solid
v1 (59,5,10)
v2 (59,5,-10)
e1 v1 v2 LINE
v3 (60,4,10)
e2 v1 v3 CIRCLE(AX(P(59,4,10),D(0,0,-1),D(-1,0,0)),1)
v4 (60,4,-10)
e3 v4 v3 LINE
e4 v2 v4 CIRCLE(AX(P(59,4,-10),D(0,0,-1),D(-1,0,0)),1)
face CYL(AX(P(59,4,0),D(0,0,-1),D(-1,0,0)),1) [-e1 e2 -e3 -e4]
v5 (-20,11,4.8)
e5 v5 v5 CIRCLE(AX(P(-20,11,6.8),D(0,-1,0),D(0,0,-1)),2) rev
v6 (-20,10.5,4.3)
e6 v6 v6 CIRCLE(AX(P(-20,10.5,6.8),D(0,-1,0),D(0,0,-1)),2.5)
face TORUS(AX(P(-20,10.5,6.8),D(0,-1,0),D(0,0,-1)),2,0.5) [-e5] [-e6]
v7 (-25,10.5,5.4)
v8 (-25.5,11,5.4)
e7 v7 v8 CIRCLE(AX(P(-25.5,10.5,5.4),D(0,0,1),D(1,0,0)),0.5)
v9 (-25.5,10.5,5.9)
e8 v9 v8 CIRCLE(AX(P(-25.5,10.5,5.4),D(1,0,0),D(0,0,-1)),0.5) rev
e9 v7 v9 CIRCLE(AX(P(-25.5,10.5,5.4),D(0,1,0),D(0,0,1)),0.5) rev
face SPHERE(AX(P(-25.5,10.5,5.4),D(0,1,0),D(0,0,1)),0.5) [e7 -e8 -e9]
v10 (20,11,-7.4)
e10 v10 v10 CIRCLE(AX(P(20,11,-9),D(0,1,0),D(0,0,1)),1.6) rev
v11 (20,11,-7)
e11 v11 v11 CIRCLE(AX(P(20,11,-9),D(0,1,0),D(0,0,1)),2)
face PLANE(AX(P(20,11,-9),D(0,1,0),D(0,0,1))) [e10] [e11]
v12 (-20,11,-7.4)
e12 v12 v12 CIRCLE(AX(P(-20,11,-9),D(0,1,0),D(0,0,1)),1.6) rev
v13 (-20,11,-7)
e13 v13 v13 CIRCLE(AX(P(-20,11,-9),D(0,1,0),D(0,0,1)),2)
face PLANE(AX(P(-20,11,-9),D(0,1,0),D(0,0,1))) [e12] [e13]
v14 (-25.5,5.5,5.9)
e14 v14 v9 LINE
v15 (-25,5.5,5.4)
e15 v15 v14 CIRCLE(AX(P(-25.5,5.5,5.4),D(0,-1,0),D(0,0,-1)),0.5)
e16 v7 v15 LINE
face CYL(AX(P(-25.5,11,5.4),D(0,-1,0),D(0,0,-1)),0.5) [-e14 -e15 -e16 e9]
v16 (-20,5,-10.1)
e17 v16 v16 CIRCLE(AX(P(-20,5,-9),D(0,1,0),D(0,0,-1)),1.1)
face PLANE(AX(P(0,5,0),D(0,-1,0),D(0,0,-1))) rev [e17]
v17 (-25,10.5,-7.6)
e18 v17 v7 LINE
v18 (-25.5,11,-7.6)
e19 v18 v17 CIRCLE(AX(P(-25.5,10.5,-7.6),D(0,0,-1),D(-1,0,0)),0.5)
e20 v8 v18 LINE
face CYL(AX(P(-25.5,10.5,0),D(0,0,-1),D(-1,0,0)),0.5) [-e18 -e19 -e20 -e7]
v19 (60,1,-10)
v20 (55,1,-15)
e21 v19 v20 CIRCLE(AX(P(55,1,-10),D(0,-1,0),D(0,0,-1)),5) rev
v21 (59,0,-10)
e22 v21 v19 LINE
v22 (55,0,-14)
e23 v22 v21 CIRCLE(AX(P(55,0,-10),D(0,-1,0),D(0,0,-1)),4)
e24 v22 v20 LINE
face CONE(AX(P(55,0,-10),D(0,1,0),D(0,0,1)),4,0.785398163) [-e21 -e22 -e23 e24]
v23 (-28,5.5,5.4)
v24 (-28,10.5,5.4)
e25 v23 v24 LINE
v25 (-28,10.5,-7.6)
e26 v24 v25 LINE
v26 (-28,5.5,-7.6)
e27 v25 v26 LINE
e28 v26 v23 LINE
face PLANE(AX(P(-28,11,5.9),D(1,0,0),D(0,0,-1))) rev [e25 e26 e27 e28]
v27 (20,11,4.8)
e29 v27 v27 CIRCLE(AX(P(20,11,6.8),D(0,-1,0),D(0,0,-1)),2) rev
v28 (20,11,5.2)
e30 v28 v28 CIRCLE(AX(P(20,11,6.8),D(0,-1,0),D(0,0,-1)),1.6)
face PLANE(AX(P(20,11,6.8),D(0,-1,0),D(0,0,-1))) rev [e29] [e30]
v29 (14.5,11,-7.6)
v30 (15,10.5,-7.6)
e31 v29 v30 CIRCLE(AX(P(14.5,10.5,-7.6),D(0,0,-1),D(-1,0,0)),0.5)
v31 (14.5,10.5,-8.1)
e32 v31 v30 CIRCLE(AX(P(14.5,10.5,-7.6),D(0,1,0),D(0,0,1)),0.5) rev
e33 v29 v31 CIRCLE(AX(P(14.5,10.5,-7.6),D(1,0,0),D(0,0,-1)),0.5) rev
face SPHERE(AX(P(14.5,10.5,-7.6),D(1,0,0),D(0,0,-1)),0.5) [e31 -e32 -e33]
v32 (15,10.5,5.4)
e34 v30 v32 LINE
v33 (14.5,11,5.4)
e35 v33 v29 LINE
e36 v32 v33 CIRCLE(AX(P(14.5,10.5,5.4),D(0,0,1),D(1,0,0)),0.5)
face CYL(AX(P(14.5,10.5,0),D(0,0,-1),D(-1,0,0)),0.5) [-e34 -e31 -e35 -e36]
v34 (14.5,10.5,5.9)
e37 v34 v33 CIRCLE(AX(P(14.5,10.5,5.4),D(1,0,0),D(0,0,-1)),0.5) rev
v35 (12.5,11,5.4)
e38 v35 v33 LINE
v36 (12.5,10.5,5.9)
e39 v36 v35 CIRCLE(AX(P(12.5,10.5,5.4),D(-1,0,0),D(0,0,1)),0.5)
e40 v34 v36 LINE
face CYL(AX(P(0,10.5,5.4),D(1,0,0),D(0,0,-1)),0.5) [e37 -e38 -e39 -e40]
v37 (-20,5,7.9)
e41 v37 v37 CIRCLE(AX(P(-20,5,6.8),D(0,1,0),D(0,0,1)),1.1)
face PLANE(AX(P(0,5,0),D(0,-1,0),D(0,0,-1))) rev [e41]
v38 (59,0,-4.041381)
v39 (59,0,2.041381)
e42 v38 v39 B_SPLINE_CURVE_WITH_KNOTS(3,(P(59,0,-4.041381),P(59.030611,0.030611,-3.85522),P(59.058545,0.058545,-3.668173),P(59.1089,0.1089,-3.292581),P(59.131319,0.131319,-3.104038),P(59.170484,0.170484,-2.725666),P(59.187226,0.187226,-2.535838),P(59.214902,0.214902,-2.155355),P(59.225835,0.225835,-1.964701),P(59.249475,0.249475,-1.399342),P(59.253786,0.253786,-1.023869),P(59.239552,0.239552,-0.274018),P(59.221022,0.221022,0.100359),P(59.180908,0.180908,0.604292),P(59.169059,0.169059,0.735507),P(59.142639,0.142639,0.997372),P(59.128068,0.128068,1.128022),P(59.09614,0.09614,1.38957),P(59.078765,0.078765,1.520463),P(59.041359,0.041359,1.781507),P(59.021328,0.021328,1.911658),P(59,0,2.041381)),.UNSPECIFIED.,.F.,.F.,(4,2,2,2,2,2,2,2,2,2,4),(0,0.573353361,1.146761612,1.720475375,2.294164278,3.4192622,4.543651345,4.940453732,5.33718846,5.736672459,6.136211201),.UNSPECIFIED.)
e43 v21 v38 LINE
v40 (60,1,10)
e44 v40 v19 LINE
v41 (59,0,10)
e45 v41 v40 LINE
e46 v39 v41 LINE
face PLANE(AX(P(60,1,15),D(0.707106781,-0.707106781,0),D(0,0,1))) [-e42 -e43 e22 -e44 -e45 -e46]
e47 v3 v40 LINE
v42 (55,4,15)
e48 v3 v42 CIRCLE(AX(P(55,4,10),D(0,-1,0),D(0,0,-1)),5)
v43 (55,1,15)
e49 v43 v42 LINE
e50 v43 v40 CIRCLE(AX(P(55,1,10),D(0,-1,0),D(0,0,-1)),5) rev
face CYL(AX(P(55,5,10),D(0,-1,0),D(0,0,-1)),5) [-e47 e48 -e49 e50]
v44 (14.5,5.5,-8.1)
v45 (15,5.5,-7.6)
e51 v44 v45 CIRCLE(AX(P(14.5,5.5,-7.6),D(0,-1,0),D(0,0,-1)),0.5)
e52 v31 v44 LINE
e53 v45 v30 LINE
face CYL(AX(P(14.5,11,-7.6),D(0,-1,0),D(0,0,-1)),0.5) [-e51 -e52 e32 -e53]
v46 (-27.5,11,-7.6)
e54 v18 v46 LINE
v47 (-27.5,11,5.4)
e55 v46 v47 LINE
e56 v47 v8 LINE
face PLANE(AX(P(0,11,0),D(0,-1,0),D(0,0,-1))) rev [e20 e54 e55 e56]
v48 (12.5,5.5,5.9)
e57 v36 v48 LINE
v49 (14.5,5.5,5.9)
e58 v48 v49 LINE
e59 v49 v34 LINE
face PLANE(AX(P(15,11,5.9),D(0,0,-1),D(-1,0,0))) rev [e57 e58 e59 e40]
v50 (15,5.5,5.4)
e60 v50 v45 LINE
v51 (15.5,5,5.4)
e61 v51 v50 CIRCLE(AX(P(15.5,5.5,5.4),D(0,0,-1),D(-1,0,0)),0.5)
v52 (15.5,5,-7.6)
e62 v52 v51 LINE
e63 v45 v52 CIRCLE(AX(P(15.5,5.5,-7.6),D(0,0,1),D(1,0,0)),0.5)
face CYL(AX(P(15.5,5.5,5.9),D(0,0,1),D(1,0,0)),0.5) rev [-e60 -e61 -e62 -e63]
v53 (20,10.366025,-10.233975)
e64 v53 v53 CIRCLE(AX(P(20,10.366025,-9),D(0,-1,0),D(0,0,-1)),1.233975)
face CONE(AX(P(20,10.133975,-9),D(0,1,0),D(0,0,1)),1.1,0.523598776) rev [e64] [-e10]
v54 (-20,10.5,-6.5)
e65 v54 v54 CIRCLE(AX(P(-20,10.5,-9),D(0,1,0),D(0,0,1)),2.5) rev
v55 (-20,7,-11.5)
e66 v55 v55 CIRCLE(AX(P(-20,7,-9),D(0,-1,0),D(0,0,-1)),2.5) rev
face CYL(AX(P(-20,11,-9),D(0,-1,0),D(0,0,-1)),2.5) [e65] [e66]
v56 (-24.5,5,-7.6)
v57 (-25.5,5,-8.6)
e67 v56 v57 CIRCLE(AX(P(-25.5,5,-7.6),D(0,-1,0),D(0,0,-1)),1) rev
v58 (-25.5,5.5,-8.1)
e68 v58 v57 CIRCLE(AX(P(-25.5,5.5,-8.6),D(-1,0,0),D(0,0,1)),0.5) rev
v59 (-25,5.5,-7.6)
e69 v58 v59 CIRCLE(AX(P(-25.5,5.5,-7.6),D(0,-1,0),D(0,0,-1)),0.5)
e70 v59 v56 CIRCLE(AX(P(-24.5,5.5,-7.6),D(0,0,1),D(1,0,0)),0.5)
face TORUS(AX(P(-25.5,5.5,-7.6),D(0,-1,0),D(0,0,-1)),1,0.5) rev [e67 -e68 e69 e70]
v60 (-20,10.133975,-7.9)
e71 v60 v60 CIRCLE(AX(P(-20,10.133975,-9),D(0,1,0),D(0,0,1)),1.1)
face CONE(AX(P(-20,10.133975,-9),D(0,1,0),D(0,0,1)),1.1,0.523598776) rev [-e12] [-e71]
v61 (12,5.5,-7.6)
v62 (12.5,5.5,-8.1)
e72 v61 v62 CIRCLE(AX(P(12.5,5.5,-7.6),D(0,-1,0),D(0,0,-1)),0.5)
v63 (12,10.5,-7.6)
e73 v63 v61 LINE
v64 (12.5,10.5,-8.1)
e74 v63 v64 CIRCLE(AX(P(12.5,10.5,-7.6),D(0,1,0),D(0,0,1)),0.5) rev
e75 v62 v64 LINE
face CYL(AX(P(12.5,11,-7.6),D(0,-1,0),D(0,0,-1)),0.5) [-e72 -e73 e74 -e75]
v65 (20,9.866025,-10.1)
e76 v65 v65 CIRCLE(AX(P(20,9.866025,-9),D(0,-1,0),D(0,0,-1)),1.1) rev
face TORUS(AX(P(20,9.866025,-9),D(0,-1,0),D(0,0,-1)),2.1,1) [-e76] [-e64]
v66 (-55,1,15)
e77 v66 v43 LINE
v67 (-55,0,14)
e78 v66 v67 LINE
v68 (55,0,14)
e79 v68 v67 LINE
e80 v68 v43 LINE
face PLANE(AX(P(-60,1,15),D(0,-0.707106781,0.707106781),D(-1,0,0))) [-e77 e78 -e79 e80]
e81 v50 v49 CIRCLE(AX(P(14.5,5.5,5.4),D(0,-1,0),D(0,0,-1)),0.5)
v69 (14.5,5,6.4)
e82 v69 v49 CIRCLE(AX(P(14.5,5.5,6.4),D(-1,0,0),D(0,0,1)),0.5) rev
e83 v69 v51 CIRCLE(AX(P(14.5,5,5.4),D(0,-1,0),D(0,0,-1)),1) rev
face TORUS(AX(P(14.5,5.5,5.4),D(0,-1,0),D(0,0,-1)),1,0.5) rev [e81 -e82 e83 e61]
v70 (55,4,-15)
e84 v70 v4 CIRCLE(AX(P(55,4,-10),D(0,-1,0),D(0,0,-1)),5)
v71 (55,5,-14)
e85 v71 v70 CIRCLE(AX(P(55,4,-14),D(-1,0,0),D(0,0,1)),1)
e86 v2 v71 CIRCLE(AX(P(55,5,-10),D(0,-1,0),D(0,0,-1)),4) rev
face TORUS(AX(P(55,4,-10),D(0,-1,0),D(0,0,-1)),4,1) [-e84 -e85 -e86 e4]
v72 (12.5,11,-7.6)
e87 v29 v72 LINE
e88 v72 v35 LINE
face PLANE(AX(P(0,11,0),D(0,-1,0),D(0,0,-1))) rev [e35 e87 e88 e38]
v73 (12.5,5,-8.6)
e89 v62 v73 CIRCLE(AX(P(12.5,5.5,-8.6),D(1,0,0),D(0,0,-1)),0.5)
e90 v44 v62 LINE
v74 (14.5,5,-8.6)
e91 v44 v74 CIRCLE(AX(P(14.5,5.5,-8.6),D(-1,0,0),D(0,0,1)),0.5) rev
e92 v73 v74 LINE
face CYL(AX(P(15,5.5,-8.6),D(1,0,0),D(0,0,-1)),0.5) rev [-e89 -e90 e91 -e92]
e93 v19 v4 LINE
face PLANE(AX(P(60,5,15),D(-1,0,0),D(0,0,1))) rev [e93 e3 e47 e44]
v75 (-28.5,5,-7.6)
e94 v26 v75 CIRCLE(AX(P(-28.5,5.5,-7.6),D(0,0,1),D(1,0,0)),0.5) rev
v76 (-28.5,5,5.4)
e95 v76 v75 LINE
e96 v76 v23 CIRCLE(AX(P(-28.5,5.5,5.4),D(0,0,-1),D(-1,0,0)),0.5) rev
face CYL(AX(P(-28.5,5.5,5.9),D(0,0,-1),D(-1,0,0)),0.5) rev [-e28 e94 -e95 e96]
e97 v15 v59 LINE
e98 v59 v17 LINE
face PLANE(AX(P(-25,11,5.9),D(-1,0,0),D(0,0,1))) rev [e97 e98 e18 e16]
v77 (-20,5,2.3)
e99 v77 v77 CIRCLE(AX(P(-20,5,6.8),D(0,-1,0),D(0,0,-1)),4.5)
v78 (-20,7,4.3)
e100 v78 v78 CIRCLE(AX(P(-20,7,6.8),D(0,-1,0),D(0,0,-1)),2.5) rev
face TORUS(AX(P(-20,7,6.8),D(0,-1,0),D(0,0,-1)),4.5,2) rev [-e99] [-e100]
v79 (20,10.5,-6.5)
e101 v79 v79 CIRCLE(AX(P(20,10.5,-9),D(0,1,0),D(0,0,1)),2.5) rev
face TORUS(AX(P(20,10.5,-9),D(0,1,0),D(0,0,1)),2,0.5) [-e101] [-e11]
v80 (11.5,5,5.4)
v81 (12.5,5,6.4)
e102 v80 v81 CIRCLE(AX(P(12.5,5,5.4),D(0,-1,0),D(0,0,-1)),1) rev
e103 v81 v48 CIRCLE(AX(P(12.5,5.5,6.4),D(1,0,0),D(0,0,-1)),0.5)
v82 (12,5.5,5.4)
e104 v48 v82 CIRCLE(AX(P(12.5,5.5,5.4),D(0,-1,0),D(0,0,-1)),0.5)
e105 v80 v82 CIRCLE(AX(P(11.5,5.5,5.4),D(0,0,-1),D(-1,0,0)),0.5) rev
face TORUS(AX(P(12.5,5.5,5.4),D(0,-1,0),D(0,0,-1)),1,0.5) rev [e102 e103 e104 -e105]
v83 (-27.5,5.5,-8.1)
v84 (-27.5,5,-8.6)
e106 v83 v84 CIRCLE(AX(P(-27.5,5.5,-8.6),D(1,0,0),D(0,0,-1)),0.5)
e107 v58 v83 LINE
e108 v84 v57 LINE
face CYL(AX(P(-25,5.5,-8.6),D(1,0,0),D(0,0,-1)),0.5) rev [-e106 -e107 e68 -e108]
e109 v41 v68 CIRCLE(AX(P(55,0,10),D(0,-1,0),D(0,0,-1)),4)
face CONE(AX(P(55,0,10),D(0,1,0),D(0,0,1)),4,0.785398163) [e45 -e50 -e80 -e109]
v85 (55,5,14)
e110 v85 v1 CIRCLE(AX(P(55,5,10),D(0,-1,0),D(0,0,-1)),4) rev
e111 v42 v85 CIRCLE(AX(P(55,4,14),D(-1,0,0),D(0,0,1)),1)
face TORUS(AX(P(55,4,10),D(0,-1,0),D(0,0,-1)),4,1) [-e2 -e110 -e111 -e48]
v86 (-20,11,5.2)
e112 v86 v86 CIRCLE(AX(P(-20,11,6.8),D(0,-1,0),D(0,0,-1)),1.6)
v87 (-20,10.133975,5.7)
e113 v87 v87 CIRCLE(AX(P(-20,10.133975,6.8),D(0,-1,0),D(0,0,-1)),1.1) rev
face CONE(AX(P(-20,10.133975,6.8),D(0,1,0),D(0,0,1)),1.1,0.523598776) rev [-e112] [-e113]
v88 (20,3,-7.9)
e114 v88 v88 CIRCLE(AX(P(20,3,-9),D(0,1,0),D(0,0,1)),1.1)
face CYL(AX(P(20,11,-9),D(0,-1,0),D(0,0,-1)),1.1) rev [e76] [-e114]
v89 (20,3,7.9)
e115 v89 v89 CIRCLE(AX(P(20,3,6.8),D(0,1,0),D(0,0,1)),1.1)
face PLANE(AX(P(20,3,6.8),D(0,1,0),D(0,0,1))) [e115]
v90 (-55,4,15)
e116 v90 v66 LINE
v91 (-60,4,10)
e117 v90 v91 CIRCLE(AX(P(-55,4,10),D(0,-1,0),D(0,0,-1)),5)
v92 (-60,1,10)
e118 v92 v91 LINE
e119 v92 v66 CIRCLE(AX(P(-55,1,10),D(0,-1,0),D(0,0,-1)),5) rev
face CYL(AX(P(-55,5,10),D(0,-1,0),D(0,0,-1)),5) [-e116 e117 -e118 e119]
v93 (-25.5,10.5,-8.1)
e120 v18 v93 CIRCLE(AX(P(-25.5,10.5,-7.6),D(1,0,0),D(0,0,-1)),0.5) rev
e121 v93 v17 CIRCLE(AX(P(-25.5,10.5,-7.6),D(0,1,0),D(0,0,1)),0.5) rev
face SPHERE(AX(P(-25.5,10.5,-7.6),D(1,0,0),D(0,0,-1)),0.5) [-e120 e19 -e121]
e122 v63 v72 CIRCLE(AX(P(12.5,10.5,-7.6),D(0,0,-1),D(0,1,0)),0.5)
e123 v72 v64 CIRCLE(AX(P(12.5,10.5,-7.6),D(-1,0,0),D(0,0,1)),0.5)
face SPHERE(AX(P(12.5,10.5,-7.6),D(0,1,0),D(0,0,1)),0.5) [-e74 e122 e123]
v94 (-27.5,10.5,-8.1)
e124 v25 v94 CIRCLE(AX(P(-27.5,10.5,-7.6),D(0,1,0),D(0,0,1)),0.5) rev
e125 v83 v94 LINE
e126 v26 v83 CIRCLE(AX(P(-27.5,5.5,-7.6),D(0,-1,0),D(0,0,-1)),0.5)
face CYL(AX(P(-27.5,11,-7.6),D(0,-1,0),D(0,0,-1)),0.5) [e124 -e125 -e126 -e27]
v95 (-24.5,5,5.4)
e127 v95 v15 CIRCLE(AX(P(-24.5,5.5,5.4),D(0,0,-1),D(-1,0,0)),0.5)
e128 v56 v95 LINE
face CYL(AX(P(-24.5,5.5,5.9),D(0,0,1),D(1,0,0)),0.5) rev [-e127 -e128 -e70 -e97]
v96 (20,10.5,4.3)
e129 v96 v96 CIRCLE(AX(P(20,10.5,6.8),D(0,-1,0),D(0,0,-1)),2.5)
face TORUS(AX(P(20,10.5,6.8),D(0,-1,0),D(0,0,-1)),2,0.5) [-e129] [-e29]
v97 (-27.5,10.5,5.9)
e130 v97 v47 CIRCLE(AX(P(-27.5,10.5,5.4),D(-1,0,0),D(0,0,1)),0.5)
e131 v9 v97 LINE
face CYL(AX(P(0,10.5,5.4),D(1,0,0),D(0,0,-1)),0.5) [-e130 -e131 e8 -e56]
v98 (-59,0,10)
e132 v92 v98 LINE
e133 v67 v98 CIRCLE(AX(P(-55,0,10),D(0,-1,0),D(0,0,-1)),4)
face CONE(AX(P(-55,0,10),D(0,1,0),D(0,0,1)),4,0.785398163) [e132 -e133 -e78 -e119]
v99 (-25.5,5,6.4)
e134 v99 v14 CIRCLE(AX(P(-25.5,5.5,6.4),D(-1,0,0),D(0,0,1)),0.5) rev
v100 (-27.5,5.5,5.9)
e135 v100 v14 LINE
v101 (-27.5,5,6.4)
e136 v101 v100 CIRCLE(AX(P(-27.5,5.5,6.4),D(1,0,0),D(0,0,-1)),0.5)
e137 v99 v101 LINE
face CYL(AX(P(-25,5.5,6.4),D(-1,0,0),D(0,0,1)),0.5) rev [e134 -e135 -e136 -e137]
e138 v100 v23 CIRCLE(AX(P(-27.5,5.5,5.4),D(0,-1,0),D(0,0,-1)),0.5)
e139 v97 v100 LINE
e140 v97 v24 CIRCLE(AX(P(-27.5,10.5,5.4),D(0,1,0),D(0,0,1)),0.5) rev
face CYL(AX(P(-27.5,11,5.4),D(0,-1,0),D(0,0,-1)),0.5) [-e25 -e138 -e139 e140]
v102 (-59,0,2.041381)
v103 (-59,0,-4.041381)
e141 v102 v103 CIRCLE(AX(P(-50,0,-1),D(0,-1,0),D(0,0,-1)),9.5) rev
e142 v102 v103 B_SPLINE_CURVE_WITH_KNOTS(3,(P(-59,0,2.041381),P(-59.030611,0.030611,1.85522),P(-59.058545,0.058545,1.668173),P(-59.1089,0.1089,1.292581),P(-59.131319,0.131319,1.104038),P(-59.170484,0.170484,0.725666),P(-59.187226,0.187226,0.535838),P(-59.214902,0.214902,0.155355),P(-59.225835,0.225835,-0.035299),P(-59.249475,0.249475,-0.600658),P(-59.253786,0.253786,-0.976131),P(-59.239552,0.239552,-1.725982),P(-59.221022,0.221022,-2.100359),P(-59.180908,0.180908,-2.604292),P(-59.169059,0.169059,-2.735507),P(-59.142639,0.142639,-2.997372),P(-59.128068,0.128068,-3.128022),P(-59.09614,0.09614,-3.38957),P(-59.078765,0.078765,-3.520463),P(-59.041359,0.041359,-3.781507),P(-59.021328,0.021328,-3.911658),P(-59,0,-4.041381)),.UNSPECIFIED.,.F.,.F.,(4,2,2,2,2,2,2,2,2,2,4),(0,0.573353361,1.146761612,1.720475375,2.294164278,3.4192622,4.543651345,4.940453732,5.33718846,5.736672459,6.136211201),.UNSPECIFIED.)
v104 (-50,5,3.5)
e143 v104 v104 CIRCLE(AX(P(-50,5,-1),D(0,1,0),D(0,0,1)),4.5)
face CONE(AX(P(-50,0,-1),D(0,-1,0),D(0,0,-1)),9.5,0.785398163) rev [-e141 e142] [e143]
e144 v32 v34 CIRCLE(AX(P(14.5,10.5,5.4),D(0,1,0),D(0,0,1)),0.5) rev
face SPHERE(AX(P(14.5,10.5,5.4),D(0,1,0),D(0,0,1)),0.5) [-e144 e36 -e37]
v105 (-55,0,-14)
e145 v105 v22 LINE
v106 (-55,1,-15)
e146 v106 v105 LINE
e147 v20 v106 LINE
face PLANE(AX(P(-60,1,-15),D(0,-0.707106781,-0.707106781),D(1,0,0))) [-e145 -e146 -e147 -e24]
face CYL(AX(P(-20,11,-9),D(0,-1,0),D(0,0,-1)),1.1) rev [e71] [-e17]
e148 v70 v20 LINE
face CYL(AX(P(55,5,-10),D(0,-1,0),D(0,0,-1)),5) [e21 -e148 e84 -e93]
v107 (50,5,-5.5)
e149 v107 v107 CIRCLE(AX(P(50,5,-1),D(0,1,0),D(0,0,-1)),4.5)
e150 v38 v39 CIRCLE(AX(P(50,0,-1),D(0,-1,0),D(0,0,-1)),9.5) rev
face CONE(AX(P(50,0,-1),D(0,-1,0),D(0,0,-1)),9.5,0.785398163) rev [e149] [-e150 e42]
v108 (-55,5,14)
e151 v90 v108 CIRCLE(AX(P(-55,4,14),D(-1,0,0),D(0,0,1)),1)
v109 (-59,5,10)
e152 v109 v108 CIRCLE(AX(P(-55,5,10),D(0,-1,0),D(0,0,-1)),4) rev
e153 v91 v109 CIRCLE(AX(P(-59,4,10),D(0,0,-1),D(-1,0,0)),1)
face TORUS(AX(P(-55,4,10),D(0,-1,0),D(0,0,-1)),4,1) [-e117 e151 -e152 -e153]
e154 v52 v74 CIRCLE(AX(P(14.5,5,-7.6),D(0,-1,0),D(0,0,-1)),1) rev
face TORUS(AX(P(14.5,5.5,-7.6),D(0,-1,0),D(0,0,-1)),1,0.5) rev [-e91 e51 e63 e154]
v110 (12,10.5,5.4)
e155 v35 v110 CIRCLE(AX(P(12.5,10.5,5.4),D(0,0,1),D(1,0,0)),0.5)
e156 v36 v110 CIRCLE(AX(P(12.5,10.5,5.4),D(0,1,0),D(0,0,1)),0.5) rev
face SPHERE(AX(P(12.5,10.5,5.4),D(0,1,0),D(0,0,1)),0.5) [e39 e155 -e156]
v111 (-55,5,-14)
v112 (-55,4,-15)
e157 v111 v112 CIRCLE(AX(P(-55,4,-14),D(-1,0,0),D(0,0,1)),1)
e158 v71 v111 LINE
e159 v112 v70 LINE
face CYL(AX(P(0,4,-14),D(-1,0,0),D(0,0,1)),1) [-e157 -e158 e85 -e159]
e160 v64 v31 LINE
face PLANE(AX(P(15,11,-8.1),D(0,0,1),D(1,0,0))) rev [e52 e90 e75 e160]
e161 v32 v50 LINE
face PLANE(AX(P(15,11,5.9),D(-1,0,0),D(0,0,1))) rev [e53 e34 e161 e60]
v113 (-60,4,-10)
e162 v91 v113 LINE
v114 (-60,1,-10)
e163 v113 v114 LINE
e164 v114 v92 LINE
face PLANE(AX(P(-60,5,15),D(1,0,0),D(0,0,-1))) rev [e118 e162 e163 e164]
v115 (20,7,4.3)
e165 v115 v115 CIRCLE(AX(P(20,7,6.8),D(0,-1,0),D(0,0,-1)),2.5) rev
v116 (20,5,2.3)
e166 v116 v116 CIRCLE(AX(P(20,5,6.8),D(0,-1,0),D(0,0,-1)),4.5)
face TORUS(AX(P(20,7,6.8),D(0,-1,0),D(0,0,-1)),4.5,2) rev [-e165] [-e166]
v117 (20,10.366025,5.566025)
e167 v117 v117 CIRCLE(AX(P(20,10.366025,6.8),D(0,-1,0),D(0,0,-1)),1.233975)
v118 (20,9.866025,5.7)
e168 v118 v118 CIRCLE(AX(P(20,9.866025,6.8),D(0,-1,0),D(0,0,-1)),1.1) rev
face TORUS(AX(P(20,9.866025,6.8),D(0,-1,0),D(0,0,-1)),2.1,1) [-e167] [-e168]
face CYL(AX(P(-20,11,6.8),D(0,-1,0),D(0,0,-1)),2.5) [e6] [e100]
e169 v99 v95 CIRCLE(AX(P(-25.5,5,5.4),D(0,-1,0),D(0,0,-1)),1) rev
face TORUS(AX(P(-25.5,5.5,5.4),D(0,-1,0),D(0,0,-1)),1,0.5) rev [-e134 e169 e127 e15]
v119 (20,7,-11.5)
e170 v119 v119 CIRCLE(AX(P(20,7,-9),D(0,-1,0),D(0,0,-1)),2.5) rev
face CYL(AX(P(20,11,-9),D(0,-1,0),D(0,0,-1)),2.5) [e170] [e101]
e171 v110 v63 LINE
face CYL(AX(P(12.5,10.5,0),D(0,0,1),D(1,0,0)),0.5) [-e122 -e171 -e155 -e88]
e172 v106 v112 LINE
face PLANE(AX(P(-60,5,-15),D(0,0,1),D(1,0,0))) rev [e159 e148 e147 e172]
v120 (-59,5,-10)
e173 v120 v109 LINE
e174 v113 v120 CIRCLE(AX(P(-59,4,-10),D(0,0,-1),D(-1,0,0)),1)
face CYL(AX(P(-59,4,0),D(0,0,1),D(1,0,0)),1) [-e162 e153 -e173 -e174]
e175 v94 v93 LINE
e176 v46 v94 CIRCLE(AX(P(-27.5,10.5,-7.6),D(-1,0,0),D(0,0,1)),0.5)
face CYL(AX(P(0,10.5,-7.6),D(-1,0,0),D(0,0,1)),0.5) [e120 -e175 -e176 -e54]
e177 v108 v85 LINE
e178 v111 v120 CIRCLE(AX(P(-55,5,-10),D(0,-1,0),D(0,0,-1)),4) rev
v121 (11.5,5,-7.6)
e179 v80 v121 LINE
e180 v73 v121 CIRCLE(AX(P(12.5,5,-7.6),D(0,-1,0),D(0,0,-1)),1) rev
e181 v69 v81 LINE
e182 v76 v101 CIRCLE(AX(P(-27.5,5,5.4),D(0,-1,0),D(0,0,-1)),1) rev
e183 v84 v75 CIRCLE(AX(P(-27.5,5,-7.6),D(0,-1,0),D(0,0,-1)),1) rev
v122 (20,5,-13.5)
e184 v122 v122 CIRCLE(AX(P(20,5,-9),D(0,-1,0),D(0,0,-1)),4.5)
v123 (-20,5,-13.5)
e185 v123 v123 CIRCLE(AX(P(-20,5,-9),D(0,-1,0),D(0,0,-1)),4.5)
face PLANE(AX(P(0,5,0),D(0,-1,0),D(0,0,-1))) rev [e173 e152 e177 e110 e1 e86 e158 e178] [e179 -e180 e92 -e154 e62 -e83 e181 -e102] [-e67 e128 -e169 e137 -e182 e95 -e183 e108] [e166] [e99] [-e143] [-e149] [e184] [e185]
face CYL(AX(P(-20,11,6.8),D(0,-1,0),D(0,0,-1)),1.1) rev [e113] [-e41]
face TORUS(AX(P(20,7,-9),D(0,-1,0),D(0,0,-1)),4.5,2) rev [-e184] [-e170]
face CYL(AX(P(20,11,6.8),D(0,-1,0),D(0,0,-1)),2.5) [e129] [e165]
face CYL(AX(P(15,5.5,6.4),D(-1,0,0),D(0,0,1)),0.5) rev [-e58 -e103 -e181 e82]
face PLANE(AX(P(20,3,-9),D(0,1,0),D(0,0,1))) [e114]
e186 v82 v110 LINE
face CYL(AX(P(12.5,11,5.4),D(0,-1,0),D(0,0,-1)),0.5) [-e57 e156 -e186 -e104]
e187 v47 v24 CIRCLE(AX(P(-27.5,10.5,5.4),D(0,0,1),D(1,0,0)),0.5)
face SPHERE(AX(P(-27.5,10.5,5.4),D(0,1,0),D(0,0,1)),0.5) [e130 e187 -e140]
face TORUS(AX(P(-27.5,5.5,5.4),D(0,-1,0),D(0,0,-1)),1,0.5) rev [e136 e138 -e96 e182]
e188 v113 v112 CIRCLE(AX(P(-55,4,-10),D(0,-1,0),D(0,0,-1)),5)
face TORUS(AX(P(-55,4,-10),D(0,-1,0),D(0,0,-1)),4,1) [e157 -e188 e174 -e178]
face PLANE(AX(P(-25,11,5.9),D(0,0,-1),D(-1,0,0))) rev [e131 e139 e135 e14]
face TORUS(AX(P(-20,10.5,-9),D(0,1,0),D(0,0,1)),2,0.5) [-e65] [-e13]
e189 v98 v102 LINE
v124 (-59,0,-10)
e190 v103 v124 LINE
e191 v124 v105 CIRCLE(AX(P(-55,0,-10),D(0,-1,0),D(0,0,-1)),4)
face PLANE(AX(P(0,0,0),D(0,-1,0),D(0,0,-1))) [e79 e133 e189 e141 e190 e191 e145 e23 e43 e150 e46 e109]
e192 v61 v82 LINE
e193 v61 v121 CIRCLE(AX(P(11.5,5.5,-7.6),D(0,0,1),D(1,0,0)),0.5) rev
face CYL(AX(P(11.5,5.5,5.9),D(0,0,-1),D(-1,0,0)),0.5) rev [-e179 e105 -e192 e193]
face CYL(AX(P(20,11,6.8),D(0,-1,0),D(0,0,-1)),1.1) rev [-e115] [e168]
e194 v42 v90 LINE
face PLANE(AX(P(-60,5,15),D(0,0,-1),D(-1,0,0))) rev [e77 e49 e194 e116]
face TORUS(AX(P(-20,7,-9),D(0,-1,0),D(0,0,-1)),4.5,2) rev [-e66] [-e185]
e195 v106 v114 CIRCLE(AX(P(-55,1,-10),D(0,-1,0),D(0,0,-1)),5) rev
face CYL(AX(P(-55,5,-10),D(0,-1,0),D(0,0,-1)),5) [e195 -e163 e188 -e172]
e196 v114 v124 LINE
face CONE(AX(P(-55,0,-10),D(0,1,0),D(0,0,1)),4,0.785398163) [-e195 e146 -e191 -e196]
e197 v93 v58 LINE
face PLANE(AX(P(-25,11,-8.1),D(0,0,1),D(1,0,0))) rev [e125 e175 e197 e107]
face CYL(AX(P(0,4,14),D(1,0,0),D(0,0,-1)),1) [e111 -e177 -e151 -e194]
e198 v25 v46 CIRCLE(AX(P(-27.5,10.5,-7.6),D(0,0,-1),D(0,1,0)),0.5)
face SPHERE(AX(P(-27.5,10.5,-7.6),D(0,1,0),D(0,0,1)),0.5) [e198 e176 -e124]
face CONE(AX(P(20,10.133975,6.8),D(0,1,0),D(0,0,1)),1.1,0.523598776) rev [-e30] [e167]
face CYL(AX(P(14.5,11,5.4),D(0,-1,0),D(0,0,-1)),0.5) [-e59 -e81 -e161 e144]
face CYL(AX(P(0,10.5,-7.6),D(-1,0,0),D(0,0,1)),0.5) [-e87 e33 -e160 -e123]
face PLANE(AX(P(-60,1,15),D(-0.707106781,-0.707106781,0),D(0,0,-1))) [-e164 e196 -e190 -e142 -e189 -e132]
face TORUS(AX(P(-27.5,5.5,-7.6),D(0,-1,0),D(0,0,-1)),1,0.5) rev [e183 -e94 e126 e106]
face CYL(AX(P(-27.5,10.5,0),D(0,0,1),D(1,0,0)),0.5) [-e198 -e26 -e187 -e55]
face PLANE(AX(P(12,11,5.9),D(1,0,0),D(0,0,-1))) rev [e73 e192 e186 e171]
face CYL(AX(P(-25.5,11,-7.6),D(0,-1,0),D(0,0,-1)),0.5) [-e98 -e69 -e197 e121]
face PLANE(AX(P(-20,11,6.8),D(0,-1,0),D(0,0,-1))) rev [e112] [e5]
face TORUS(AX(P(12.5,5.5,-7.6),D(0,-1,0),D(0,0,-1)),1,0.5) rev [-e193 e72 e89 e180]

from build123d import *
from OCP.BRepFilletAPI import BRepFilletAPI_MakeChamfer

# Parameters (mm, degrees)
SKETCH_1_W          = 120
SKETCH_1_H          = 30
SKETCH_1_R          = 4.5
EXTRUDE_1_DEPTH     = 5
FILLET_1_R          = 5
SKETCH_2_R          = 2.5
SKETCH_2_R_2        = 1.1
SKETCH_2_W          = 3
SKETCH_2_H          = 14
EXTRUDE_2_DEPTH     = 6
CUT_EXTRUDE_START   = -8
SKETCH_3_R          = 1.1
CUT_EXTRUDE_1_DEPTH = 8
FILLET_2_R          = 2
FILLET_3_R          = 0.5
FILLET_4_R          = 1
CHAMFER_1_SIZE      = 5
CHAMFER_2_SIZE      = 1
CHAMFER_3_SIZE      = 0.5
CHAMFER_3_SIZE2     = 0.866025404
FILLET_5_R          = 1


# Some blends are built 0.0001 mm under size
with BuildPart() as part:
    # Эскиз1 → Бобышка-Вытянуть1 (new body)
    with BuildSketch(Plane(origin=(0, 0, 0), x_dir=(1, 0, 0), z_dir=(0, 1, 0))):
        Rectangle(SKETCH_1_W, SKETCH_1_H)
        with Locations(Location((-50, 1, 0), (0, 0, 270))):
            Circle(SKETCH_1_R, mode=Mode.SUBTRACT)
        with Locations(Location((50, 1, 0), (0, 0, 90))):
            Circle(SKETCH_1_R, mode=Mode.SUBTRACT)
    extrude(amount=EXTRUDE_1_DEPTH)

    # Скругление1
    fillet_1_edges = [part.edges().sort_by_distance(p)[0] for p in [
        (60, 2.5, 15),
        (-60, 2.5, 15),
        (-60, 2.5, -15),
        (60, 2.5, -15),
    ]]
    fillet(fillet_1_edges, radius=FILLET_1_R)

    # Эскиз2 → Бобышка-Вытянуть2 (add)
    # profile 1 of 6: a face of its own
    with BuildSketch(Plane(origin=(0, 5, 0), x_dir=(1, 0, 0), z_dir=(0, 1, 0))):
        with Locations(Location((20, 9, 0), (0, 0, 90))):
            Circle(SKETCH_2_R)
        with Locations(Location((20, 9, 0), (0, 0, 90))):
            Circle(SKETCH_2_R_2, mode=Mode.SUBTRACT)
    # profile 2 of 6: a face of its own
    with BuildSketch(Plane(origin=(0, 5, 0), x_dir=(1, 0, 0), z_dir=(0, 1, 0))):
        with Locations(Location((20, -6.8, 0), (0, 0, 90))):
            Circle(SKETCH_2_R)
        with Locations(Location((20, -6.8, 0), (0, 0, 270))):
            Circle(SKETCH_2_R_2, mode=Mode.SUBTRACT)
    # profile 3 of 6: a face of its own
    with BuildSketch(Plane(origin=(0, 5, 0), x_dir=(1, 0, 0), z_dir=(0, 1, 0))):
        with Locations(Location((-20, 9, 0), (0, 0, 90))):
            Circle(SKETCH_2_R)
        with Locations(Location((-20, 9, 0), (0, 0, 90))):
            Circle(SKETCH_2_R_2, mode=Mode.SUBTRACT)
    # profile 4 of 6: a face of its own
    with BuildSketch(Plane(origin=(0, 5, 0), x_dir=(1, 0, 0), z_dir=(0, 1, 0))):
        with Locations(Location((-20, -6.8, 0), (0, 0, 90))):
            Circle(SKETCH_2_R)
        with Locations(Location((-20, -6.8, 0), (0, 0, 270))):
            Circle(SKETCH_2_R_2, mode=Mode.SUBTRACT)
    # profile 5 of 6: a face of its own
    with BuildSketch(Plane(origin=(0, 5, 0), x_dir=(1, 0, 0), z_dir=(0, 1, 0))):
        with Locations((13.5, 1.1)):
            Rectangle(SKETCH_2_W, SKETCH_2_H)
    # profile 6 of 6: a face of its own
    with BuildSketch(Plane(origin=(0, 5, 0), x_dir=(1, 0, 0), z_dir=(0, 1, 0))):
        with Locations((-26.5, 1.1)):
            Rectangle(SKETCH_2_W, SKETCH_2_H)
    extrude(amount=EXTRUDE_2_DEPTH)

    # Эскиз3 → Cut-Extrude 1 (cut)
    with BuildSketch(Plane(origin=(0, 11, 0), x_dir=(1, 0, 0), z_dir=(0, 1, 0)).offset(CUT_EXTRUDE_START)):
        with Locations(Location((20, -6.8, 0), (0, 0, 270))):
            Circle(SKETCH_3_R)
        with Locations(Location((20, 9, 0), (0, 0, 90))):
            Circle(SKETCH_3_R)
    extrude(amount=CUT_EXTRUDE_1_DEPTH, mode=Mode.SUBTRACT)

    # Скругление2
    fillet_2_edges = [part.edges().sort_by_distance(p)[0] for p in [
        (20, 5, -6.5),
        (20, 5, 9.3),
        (-20, 5, -6.5),
        (-20, 5, 9.3),
    ]]
    fillet(fillet_2_edges, radius=FILLET_2_R)

    # Скругление3
    fillet_3_edges = [part.edges().sort_by_distance(p)[0] for p in [
        (20, 11, -6.5),
        (20, 11, 9.3),
        (13.5, 5, -8.1),
        (15, 8, -8.1),
        (12, 5, -1.1),
        (12, 8, -8.1),
        (13.5, 5, 5.9),
        (12, 8, 5.9),
        (15, 5, -1.1),
        (15, 8, 5.9),
        (13.5, 11, -8.1),
        (12, 11, -1.1),
        (13.5, 11, 5.9),
        (15, 11, -1.1),
        (-20, 11, -6.5),
        (-20, 11, 9.3),
        (-26.5, 5, -8.1),
        (-25, 8, -8.1),
        (-28, 5, -1.1),
        (-28, 8, -8.1),
        (-26.5, 5, 5.9),
        (-28, 8, 5.9),
        (-25, 5, -1.1),
        (-25, 8, 5.9),
        (-26.5, 11, -8.1),
        (-28, 11, -1.1),
        (-26.5, 11, 5.9),
        (-25, 11, -1.1),
    ]]
    fillet(fillet_3_edges, radius=FILLET_3_R)

    # Скругление4
    fillet_4_edges = [part.edges().sort_by_distance(p)[0] for p in [
        (-60, 5, 0),
        (0, 5, -15),
        (60, 5, 0),
        (0, 5, 15),
        (58.535533906, 5, 13.535533906),
        (58.535533906, 5, -13.535533906),
        (-58.535533906, 5, 13.535533906),
        (-58.535533906, 5, -13.535533906),
    ]]
    fillet(fillet_4_edges, radius=FILLET_4_R)

    # Фаска1
    chamfer_1_edges = [part.edges().sort_by_distance(p)[0] for p in [
        (-50, 0, -5.5),
        (50, 0, 3.5),
    ]]
    chamfer(chamfer_1_edges, length=CHAMFER_1_SIZE - 0.0001)  # a hair under: the kernel refuses the full size

    # Фаска2
    # the kernel refuses this chamfer: 1 mm, written as the material it takes off along each edge
    with BuildSketch(Plane(origin=(-60, 0, -10), x_dir=(0.9996219169112968, -0.027495876610586292, 0), z_dir=(0, 0, 1)), Plane(origin=(60, 0, 10), x_dir=(-0.9996219169112968, -0.027495876610586292, 0), z_dir=(0, 0, -1))) as chamfer_2_piece_1:
        Polygon((CHAMFER_2_SIZE * 0.999621916911, CHAMFER_2_SIZE * 0.0274958766106), (-CHAMFER_2_SIZE * 0.0274958766106, CHAMFER_2_SIZE * 0.999621916911), (0, 0), align=None)
    extrude(amount=20, mode=Mode.SUBTRACT)
    with BuildSketch(Plane(origin=(-55, 0, 15), x_dir=(0, -0.02749587661058639, -0.9996219169112968), z_dir=(1, 0, 0)), Plane(origin=(55, 0, -15), x_dir=(0, -0.02749587661058639, 0.9996219169112968), z_dir=(-1, 0, 0))) as chamfer_2_piece_2:
        Polygon((CHAMFER_2_SIZE * 0.999621916911, CHAMFER_2_SIZE * 0.0274958766106), (-CHAMFER_2_SIZE * 0.0274958766106, CHAMFER_2_SIZE * 0.999621916911), (0, 0), align=None)
    extrude(amount=110, mode=Mode.SUBTRACT)
    with BuildSketch(Plane(origin=(55, 0, 10), x_dir=(0, 0, 1), z_dir=(-1, 0, 0))) as chamfer_2_piece_3:
        Polygon((5 - CHAMFER_2_SIZE, 0), (5, CHAMFER_2_SIZE), (5, 0), align=None)
    revolve(axis=Axis((55, 0, 10), (0, 1, 0)), revolution_arc=90, mode=Mode.SUBTRACT)
    with BuildSketch(Plane(origin=(55, 0, -10), x_dir=(1, 0, 0), z_dir=(0, 0, 1))) as chamfer_2_piece_4:
        Polygon((5 - CHAMFER_2_SIZE, 0), (5, CHAMFER_2_SIZE), (5, 0), align=None)
    revolve(axis=Axis((55, 0, -10), (0, 1, 0)), revolution_arc=90, mode=Mode.SUBTRACT)
    with BuildSketch(Plane(origin=(-55, 0, 10), x_dir=(0, 0, 1), z_dir=(1, 0, 0))) as chamfer_2_piece_5:
        Polygon((5 - CHAMFER_2_SIZE, 0), (5, -CHAMFER_2_SIZE), (5, 0), align=None)
    revolve(axis=Axis((-55, 0, 10), (0, -1, 0)), revolution_arc=90, mode=Mode.SUBTRACT)
    with BuildSketch(Plane(origin=(-55, 0, -10), x_dir=(0, 0, -1), z_dir=(1, 0, 0))) as chamfer_2_piece_6:
        Polygon((5 - CHAMFER_2_SIZE, 0), (5, CHAMFER_2_SIZE), (5, 0), align=None)
    revolve(axis=Axis((-55, 0, -10), (0, 1, 0)), revolution_arc=90, mode=Mode.SUBTRACT)

    # Фаска3: one chamfer whose edges measure the first distance from different faces: ONE call of the kernel's chamfer builder (chamfer() names one face for all edges)
    chamfer_3_edges_1 = [part.edges().sort_by_distance(p)[0] for p in [
        (20, 11, -7.9),
    ]]
    chamfer_3_side_1 = [part.faces().sort_by_distance(p)[0] for p in [
        (20, 11, -7.056568542),
    ]]
    chamfer_3_edges_2 = [part.edges().sort_by_distance(p)[0] for p in [
        (20, 11, 5.7),
    ]]
    chamfer_3_side_2 = [part.faces().sort_by_distance(p)[0] for p in [
        (20, 11, 8.743431458),
    ]]
    chamfer_3_edges_3 = [part.edges().sort_by_distance(p)[0] for p in [
        (-20, 11, -7.9),
    ]]
    chamfer_3_side_3 = [part.faces().sort_by_distance(p)[0] for p in [
        (-20, 11, -7.056568542),
    ]]
    chamfer_3_edges_4 = [part.edges().sort_by_distance(p)[0] for p in [
        (-20, 11, 5.7),
    ]]
    chamfer_3_side_4 = [part.faces().sort_by_distance(p)[0] for p in [
        (-20, 11, 8.743431458),
    ]]
    chamfer_3 = BRepFilletAPI_MakeChamfer(part.part.solid().wrapped)
    for e in chamfer_3_edges_1:
        chamfer_3.Add(CHAMFER_3_SIZE, CHAMFER_3_SIZE2, e.wrapped, chamfer_3_side_1[0].wrapped)  # the first distance lies on this face
    for e in chamfer_3_edges_2:
        chamfer_3.Add(CHAMFER_3_SIZE, CHAMFER_3_SIZE2, e.wrapped, chamfer_3_side_2[0].wrapped)  # the first distance lies on this face
    for e in chamfer_3_edges_3:
        chamfer_3.Add(CHAMFER_3_SIZE, CHAMFER_3_SIZE2, e.wrapped, chamfer_3_side_3[0].wrapped)  # the first distance lies on this face
    for e in chamfer_3_edges_4:
        chamfer_3.Add(CHAMFER_3_SIZE, CHAMFER_3_SIZE2, e.wrapped, chamfer_3_side_4[0].wrapped)  # the first distance lies on this face
    add(Compound.cast(chamfer_3.Shape()), mode=Mode.REPLACE)

    # Скругление5
    fillet_5_edges = [part.edges().sort_by_distance(p)[0] for p in [
        (20, 10.133974596, 5.7),
        (20, 10.133974596, -7.9),
    ]]
    fillet(fillet_5_edges, radius=FILLET_5_R)


solid = part.part
